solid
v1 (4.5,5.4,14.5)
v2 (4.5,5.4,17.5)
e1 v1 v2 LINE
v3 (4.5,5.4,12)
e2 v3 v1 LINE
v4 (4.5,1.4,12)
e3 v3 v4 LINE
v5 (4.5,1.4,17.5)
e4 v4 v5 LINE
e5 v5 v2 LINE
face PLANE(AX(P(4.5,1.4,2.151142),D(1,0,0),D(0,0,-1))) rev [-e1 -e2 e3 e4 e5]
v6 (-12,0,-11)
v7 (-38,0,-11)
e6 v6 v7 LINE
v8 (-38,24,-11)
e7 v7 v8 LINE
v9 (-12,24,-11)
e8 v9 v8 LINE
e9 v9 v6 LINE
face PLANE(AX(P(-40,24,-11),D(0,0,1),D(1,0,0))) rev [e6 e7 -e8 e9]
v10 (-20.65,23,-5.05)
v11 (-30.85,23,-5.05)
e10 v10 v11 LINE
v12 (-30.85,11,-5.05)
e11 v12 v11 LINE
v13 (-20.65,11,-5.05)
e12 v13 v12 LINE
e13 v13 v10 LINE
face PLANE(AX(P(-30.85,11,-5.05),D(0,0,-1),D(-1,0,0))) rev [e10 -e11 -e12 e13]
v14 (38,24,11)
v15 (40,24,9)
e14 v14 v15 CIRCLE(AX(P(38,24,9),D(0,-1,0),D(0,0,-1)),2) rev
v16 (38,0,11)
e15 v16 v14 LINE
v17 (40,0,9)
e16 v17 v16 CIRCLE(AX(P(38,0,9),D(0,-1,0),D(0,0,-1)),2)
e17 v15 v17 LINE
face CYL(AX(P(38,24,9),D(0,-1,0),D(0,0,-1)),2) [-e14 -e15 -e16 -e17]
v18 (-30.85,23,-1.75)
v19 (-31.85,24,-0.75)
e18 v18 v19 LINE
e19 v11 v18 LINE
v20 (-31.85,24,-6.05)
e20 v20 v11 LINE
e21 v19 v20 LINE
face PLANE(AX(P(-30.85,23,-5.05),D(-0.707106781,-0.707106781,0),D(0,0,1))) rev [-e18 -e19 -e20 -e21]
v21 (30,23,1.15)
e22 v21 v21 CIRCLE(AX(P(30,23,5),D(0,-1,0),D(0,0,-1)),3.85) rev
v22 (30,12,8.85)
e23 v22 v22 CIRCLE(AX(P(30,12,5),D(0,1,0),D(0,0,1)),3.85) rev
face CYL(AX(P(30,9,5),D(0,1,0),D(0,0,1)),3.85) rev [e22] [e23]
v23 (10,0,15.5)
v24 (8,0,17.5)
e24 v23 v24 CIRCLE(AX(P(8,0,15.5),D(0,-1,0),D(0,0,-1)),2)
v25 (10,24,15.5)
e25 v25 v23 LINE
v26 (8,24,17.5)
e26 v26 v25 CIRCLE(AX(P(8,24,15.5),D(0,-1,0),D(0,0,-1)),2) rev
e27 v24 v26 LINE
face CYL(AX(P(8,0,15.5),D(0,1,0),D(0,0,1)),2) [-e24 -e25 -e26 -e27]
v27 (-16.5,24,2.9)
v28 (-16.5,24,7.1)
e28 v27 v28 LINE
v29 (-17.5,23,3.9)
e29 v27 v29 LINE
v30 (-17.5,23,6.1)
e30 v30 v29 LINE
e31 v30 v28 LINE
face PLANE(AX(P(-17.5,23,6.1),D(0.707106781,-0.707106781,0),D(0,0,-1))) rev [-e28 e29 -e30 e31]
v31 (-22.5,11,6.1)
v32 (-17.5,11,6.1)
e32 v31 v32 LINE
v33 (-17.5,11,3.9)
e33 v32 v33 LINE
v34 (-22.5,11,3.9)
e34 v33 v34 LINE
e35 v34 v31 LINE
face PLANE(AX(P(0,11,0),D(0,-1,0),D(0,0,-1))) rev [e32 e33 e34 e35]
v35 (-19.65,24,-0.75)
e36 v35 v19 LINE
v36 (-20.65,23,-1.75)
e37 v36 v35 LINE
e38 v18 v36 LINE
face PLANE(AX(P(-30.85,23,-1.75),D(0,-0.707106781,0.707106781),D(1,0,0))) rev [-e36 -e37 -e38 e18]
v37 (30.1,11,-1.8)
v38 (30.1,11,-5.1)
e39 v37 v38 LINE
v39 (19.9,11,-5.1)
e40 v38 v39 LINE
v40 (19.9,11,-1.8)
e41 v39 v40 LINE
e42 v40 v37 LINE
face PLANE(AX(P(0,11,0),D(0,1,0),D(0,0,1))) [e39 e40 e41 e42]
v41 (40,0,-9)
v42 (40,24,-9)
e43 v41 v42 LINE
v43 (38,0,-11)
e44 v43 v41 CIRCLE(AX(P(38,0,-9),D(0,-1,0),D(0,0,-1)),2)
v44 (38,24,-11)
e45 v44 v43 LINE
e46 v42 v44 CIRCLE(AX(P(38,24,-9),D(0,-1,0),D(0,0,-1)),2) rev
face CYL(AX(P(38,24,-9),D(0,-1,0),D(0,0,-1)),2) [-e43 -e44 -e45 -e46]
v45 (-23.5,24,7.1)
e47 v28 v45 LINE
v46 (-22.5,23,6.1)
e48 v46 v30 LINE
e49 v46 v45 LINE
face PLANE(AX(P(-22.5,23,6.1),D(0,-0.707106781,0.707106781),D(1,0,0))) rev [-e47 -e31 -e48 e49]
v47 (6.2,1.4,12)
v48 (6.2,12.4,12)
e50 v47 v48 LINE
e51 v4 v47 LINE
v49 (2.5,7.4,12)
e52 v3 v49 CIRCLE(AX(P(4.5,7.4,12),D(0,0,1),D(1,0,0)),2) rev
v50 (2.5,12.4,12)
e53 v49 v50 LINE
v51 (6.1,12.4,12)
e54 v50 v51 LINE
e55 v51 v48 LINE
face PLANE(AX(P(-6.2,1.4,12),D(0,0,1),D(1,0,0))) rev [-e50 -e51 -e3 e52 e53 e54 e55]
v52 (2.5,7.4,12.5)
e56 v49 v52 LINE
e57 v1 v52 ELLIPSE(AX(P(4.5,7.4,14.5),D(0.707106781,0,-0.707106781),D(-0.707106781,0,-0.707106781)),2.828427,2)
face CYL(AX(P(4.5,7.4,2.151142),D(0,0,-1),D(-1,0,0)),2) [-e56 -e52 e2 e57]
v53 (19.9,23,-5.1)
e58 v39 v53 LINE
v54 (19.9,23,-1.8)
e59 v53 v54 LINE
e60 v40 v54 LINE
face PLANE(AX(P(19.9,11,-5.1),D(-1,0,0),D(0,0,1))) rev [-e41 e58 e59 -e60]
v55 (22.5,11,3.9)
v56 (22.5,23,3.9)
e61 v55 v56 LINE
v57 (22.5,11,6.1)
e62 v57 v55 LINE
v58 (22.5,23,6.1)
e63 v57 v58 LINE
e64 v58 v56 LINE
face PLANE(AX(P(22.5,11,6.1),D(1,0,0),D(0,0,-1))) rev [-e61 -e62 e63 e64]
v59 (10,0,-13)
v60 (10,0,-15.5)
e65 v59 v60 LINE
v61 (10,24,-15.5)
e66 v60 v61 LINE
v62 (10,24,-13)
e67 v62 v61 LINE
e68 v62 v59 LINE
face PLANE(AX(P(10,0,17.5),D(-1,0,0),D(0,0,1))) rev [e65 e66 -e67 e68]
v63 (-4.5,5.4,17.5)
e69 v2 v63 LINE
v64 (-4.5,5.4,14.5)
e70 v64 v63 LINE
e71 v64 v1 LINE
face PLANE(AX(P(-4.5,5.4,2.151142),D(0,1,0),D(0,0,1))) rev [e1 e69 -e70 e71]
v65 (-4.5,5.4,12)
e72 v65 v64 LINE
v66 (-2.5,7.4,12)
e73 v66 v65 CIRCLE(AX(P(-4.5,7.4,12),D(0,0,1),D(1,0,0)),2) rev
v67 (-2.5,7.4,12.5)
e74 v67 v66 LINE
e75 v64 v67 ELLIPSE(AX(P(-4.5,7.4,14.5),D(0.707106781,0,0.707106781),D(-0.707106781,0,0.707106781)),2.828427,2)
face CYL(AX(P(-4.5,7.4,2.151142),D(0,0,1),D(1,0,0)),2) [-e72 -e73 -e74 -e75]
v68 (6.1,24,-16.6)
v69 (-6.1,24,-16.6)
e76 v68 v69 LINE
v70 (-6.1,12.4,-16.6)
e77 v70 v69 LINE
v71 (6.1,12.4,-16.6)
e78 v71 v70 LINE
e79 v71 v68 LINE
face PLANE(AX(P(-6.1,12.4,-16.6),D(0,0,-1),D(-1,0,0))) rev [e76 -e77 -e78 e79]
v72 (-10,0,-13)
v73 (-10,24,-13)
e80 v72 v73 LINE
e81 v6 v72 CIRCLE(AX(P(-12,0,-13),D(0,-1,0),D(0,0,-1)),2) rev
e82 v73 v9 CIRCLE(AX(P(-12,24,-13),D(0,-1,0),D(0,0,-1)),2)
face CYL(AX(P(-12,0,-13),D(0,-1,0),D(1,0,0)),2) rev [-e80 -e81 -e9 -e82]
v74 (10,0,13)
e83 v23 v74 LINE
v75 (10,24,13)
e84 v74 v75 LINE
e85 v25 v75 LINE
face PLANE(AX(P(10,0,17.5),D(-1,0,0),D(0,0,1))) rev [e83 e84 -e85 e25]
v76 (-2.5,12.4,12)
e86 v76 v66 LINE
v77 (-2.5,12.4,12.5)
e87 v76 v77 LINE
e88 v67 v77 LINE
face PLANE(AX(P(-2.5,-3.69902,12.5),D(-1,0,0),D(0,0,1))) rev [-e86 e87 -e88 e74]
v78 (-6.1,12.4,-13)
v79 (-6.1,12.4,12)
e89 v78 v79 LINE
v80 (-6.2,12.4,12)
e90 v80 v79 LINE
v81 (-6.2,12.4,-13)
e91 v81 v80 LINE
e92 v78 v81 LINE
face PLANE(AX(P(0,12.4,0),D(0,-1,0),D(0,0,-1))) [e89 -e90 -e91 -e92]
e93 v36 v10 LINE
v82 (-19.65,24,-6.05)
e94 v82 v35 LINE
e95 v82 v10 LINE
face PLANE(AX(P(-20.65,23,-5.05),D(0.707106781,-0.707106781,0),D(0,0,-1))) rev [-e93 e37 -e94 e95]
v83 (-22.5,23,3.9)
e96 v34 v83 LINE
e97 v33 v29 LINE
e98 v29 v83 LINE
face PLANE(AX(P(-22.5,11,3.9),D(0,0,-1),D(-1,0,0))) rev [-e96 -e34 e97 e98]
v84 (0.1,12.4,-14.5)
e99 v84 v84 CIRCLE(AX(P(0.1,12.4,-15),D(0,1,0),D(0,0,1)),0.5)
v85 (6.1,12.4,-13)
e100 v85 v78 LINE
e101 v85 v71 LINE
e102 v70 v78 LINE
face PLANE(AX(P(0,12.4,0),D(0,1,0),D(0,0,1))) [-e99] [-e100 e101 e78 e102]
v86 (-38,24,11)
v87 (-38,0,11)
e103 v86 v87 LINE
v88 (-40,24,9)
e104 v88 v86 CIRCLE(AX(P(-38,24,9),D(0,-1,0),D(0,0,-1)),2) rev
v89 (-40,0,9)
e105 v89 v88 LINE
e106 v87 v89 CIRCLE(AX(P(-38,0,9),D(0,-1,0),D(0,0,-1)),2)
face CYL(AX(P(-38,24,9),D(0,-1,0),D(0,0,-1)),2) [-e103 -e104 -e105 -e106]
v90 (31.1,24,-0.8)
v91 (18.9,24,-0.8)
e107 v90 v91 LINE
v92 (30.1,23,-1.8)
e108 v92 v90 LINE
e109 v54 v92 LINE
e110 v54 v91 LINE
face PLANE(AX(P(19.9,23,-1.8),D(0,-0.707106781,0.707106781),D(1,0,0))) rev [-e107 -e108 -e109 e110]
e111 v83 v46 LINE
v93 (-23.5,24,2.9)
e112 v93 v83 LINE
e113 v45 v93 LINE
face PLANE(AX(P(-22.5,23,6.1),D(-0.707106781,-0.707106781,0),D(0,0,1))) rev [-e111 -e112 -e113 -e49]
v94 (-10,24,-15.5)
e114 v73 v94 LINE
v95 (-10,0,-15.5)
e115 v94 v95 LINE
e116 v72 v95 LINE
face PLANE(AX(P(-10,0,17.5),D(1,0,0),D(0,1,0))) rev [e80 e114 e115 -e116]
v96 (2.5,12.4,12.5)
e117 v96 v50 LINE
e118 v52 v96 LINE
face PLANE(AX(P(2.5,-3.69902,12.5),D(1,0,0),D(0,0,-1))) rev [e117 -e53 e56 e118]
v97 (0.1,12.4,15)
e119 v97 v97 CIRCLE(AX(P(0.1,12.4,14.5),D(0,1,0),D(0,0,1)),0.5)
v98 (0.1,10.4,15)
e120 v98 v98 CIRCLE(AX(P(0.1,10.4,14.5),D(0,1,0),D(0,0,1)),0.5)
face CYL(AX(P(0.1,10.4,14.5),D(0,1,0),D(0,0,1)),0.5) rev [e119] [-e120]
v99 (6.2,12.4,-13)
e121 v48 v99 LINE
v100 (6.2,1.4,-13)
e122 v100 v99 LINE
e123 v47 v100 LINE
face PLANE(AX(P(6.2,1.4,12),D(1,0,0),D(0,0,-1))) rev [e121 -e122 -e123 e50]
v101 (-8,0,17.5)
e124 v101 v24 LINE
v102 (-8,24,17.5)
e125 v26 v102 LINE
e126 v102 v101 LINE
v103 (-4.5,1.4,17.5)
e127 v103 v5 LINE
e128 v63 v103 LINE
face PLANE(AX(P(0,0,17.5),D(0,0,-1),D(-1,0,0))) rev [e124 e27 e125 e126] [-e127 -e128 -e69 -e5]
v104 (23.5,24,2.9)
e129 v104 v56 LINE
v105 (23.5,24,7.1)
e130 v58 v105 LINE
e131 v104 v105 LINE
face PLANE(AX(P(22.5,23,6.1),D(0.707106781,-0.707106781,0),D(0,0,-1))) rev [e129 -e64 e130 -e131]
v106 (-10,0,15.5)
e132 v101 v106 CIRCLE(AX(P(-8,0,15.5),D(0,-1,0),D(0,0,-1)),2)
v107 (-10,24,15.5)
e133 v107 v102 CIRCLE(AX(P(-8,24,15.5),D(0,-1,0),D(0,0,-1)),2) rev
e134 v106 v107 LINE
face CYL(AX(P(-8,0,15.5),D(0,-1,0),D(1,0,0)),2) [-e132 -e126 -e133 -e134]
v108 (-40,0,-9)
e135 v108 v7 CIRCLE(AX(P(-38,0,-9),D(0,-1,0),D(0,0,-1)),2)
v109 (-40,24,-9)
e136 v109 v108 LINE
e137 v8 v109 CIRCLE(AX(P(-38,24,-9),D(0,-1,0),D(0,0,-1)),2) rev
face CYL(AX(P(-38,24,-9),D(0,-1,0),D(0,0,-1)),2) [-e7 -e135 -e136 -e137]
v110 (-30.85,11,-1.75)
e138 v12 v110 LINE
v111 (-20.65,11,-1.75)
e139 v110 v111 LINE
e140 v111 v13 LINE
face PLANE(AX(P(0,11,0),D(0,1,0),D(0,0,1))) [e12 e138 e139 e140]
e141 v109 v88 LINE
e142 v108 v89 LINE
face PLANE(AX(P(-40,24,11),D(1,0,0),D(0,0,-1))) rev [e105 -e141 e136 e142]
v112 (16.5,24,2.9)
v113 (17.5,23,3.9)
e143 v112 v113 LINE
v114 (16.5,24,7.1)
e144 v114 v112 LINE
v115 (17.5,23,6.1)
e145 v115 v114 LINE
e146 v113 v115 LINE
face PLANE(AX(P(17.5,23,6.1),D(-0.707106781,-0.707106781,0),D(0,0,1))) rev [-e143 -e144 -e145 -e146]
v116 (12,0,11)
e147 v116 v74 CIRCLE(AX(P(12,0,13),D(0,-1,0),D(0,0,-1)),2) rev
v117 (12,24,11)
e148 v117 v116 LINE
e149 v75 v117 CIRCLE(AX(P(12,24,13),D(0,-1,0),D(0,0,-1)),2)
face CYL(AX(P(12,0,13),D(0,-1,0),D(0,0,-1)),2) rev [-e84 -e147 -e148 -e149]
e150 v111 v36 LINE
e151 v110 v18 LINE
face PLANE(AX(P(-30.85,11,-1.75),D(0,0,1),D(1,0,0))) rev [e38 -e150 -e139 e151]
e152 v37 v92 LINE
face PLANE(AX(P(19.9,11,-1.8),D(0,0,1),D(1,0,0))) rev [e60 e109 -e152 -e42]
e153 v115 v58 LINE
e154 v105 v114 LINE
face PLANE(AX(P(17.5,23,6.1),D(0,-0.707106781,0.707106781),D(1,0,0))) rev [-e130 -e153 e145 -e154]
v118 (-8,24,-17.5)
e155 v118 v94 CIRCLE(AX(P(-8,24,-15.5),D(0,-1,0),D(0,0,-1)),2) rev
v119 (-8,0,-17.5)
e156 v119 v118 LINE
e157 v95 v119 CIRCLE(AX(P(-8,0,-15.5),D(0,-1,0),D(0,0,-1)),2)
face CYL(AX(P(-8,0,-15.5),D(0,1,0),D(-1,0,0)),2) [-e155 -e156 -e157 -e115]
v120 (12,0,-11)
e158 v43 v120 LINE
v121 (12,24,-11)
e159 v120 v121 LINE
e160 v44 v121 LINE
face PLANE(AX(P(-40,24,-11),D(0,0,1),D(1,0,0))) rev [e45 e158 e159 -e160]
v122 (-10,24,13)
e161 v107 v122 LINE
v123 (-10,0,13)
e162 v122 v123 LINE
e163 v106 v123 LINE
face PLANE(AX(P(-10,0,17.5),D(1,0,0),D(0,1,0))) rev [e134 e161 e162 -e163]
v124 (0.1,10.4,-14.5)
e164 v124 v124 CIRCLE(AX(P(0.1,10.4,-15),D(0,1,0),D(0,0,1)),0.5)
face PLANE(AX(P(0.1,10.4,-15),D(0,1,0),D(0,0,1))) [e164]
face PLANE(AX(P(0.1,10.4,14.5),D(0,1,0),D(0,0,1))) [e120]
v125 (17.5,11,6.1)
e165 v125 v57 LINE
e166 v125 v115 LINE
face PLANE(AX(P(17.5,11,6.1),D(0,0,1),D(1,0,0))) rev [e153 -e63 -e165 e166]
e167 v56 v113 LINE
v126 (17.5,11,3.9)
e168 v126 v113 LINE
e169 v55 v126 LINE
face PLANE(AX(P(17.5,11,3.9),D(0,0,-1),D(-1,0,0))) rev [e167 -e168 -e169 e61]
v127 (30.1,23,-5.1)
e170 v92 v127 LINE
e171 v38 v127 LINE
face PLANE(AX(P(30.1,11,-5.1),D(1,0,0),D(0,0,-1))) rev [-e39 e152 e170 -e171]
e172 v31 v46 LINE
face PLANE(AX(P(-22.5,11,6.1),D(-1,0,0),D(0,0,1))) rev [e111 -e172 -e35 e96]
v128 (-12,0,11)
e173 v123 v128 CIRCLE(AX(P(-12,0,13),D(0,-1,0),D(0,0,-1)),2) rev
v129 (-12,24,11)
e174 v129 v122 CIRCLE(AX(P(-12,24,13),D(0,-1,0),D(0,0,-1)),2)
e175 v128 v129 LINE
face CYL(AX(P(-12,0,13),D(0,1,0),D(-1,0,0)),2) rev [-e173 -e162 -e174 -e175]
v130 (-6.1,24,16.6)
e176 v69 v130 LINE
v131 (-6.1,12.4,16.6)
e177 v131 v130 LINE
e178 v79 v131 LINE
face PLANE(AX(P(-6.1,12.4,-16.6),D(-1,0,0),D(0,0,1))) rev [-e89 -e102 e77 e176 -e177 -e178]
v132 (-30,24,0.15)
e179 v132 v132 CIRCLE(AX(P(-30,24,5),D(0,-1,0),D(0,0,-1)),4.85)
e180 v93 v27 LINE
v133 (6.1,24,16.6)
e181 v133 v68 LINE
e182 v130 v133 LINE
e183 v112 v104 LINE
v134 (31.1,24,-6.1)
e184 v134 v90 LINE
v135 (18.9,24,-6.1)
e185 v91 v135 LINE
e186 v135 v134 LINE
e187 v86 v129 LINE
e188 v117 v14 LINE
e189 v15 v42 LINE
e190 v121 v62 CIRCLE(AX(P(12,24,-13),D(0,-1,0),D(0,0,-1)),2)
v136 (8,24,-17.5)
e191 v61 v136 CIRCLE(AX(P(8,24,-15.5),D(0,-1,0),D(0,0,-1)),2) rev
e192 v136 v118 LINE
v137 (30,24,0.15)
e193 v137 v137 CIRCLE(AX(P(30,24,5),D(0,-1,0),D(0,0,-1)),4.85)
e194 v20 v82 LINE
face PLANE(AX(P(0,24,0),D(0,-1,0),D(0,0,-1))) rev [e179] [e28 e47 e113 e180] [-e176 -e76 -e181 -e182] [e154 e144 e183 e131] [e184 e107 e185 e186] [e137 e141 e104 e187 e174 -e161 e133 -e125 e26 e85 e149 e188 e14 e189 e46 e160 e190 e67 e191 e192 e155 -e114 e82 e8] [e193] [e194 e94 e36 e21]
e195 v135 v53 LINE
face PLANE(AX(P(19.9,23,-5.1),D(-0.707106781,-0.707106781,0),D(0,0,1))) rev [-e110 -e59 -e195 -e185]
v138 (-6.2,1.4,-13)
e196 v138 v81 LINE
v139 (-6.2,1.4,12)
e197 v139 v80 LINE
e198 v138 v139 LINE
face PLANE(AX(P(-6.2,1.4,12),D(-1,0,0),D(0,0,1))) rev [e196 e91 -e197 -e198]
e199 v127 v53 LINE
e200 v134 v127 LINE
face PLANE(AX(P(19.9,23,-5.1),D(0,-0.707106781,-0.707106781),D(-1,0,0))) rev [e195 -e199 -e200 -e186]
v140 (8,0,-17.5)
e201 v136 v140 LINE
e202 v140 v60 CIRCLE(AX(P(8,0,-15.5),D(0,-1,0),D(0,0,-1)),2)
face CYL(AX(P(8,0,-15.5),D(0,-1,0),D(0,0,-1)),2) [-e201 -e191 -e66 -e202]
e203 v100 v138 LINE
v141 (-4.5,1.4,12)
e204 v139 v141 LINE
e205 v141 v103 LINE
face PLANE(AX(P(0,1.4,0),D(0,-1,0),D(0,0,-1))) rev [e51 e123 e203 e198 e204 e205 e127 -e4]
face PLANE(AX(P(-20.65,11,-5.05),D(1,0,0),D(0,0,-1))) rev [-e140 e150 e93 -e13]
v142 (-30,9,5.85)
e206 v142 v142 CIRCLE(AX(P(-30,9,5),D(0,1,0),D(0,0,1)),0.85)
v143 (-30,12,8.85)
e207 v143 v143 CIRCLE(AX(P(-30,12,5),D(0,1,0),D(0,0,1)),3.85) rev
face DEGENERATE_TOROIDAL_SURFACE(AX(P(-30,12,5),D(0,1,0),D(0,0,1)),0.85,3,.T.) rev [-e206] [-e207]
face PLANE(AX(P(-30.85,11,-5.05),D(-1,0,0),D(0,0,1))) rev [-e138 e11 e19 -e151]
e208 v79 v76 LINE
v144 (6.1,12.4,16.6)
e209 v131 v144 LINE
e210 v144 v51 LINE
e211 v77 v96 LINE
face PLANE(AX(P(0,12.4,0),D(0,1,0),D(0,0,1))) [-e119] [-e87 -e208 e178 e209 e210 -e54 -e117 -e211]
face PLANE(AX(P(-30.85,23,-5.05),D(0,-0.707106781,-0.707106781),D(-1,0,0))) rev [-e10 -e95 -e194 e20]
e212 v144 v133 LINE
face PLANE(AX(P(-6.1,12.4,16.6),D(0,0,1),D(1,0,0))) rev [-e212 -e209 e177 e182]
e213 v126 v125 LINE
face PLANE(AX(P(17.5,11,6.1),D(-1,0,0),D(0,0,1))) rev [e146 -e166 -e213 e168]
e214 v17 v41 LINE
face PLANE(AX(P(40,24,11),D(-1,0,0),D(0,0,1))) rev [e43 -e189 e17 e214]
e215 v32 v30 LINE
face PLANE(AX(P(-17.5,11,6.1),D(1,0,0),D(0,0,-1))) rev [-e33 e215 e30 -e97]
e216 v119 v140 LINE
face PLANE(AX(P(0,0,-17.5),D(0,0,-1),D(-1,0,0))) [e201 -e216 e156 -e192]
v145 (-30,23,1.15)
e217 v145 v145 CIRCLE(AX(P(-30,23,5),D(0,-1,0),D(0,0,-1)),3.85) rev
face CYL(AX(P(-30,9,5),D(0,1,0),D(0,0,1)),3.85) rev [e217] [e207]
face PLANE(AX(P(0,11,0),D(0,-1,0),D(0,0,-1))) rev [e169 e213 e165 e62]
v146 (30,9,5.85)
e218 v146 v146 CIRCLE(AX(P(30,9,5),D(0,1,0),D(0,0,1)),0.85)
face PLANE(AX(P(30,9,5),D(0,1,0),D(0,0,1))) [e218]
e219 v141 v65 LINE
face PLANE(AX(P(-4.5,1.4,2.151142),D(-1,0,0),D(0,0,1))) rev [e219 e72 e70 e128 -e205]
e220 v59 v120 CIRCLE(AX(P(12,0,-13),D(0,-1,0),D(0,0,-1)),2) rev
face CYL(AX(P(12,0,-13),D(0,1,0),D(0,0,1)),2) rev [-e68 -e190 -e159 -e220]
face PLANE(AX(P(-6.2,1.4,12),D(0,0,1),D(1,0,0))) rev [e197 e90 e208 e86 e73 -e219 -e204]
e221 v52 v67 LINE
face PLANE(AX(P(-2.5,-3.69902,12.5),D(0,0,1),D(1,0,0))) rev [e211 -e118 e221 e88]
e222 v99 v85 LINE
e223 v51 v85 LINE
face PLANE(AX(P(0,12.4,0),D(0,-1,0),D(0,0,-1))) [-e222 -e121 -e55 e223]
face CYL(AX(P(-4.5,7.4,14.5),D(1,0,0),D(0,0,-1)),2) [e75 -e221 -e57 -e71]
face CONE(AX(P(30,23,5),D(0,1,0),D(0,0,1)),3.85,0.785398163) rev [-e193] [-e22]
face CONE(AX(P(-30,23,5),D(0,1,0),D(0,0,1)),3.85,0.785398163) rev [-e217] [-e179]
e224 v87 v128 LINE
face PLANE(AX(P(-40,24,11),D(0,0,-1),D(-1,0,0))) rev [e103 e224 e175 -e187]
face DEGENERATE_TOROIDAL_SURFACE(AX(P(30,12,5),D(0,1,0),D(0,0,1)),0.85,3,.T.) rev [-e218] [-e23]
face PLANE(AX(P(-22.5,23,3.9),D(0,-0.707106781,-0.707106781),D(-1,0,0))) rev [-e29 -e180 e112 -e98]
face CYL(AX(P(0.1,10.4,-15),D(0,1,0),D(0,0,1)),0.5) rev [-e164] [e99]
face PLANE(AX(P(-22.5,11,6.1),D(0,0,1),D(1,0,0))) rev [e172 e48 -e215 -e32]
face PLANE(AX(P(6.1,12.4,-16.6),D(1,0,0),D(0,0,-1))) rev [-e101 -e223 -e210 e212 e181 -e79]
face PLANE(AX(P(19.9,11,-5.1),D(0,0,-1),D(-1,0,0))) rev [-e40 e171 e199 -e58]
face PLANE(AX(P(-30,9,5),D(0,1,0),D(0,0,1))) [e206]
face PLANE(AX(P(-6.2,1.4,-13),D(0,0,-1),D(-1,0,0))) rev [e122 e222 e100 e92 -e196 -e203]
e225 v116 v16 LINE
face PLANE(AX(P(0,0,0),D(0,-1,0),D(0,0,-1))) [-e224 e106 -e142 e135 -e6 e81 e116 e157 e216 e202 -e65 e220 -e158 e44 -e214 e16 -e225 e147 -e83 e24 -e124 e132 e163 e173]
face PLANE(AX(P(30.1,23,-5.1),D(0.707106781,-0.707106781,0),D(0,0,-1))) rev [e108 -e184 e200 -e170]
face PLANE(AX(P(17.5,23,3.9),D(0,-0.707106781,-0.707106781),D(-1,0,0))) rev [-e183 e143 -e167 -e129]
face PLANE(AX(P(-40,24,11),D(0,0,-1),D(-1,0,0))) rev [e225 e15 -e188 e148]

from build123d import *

# Parameters (mm, degrees)
SKETCH1_W               = 80
SKETCH1_H               = 22
BOSS_EXTRUDE1_DEPTH     = 24
SKETCH2_R               = 3.85
EYESHAFT_HOLES_DEPTH    = 15
SKETCH5_W               = 5
SKETCH5_H               = 2.2
FRONT_LEG_HOLES_DEPTH   = 13
SKETCH6_W               = 20
SKETCH6_H               = 24
SERVO_BLOCK_DEPTH       = 17.5
SKETCH7_W               = 10.2
SKETCH7_H               = 3.3
BACK_LEGS_DEPTH         = 13
FILLET1_R               = 3
SKETCH8_R               = 2.714277304
CUT_EXTRUDE4_DEPTH      = 14
SKETCH9_W               = 12.2
SKETCH9_H               = 33.2
SERVO_ARMS1_DEPTH       = 11.6
FILLET2_R               = 2
CHAMFER1_SIZE           = 1
SKETCH14_W              = 12.4
SKETCH14_H              = 25
CUT_EXTRUDE5_DEPTH      = 11
SKETCH15_W              = 9
SKETCH15_H              = 4
CUT_EXTRUDE6_DEPTH      = 5.5
SKETCH16_W              = 5
SKETCH16_H              = 1
CUT_EXTRUDE7_DEPTH      = 11
SKETCH13_R              = 0.5
SERVO_SCREW_HOLES_DEPTH = 2
FILLET3_R               = 2


with BuildPart() as part:
    # Sketch1 → Boss-Extrude1 (new body)
    with BuildSketch(Plane(origin=(0, 0, 0), x_dir=(1, 0, 0), z_dir=(0, 1, 0))):
        Rectangle(SKETCH1_W, SKETCH1_H)
    extrude(amount=BOSS_EXTRUDE1_DEPTH)

    # Sketch2 → Eyeshaft holes (cut)
    with BuildSketch(Plane(origin=(0, 24, 0), x_dir=(1, 0, 0), z_dir=(0, 1, 0))):
        with Locations(Location((-30, -5, 0), (0, 0, 270))):
            Circle(SKETCH2_R)
        with Locations(Location((30, -5, 0), (0, 0, 270))):
            Circle(SKETCH2_R)
    extrude(amount=-EYESHAFT_HOLES_DEPTH, mode=Mode.SUBTRACT)

    # Sketch5 → Front leg holes (cut)
    with BuildSketch(Plane(origin=(0, 24, 0), x_dir=(1, 0, 0), z_dir=(0, 1, 0))):
        with Locations((-20, -5)):
            Rectangle(SKETCH5_W, SKETCH5_H)
        with Locations((20, -5)):
            Rectangle(SKETCH5_W, SKETCH5_H)
    extrude(amount=-FRONT_LEG_HOLES_DEPTH, mode=Mode.SUBTRACT)

    # Sketch6 → Servo block (add, symmetric)
    with BuildSketch(Plane.XY):
        with Locations((0, 12)):
            Rectangle(SKETCH6_W, SKETCH6_H)
    extrude(amount=SERVO_BLOCK_DEPTH, both=True)

    # Sketch7 → Back Legs (cut)
    with BuildSketch(Plane(origin=(0, 24, 0), x_dir=(1, 0, 0), z_dir=(0, 1, 0))):
        with Locations((-25.75, 3.4)):
            Rectangle(SKETCH7_W, SKETCH7_H)
        with Locations((25, 3.45)):
            Rectangle(SKETCH7_W, SKETCH7_H)
    extrude(amount=-BACK_LEGS_DEPTH, mode=Mode.SUBTRACT)

    # Fillet1
    fillet1_edges = [part.edges().sort_by_distance(p)[0] for p in [
        (-30, 9, 1.15),
        (30, 9, 1.15),
    ]]
    fillet(fillet1_edges, radius=FILLET1_R)

    # Sketch8 → Cut-Extrude4 (cut)
    with BuildSketch(Plane(origin=(0, 24, 0), x_dir=(1, 0, 0), z_dir=(0, 1, 0))):
        with Locations(Location((0, -5, 0), (0, 0, 270))):
            Circle(SKETCH8_R)
    extrude(amount=-CUT_EXTRUDE4_DEPTH, mode=Mode.SUBTRACT)

    # Sketch9 → Servo arms1 (cut)
    with BuildSketch(Plane(origin=(0, 24, 0), x_dir=(1, 0, 0), z_dir=(0, 1, 0))):
        Rectangle(SKETCH9_W, SKETCH9_H)
    extrude(amount=-SERVO_ARMS1_DEPTH, mode=Mode.SUBTRACT)

    # Fillet2
    fillet2_edges = [part.edges().sort_by_distance(p)[0] for p in [
        (10, 12, -11),
        (10, 12, -17.5),
        (10, 12, 11),
        (-10, 12, -11),
        (-10, 12, -17.5),
        (-10, 12, 11),
        (10, 12, 17.5),
        (-10, 12, 17.5),
        (40, 12, 11),
        (-40, 12, 11),
        (-40, 12, -11),
        (40, 12, -11),
    ]]
    fillet(fillet2_edges, radius=FILLET2_R)

    # Chamfer1
    chamfer1_edges = [part.edges().sort_by_distance(p)[0] for p in [
        (-30, 24, 1.15),
        (30, 24, 1.15),
        (-17.5, 24, 5),
        (-20, 24, 3.9),
        (-22.5, 24, 5),
        (-20, 24, 6.1),
        (22.5, 24, 5),
        (20, 24, 3.9),
        (17.5, 24, 5),
        (20, 24, 6.1),
        (-30.85, 24, -3.4),
        (-25.75, 24, -1.75),
        (-20.65, 24, -3.4),
        (-25.75, 24, -5.05),
        (19.9, 24, -3.45),
        (25, 24, -1.8),
        (30.1, 24, -3.45),
        (25, 24, -5.1),
    ]]
    chamfer(chamfer1_edges, length=CHAMFER1_SIZE)

    # Sketch14 → Cut-Extrude5 (cut)
    with BuildSketch(Plane(origin=(0, 12.4, 0), x_dir=(1, 0, 0), z_dir=(0, 1, 0))):
        with Locations((0, 0.5)):
            Rectangle(SKETCH14_W, SKETCH14_H)
    extrude(amount=-CUT_EXTRUDE5_DEPTH, mode=Mode.SUBTRACT)

    # Sketch15 → Cut-Extrude6 (cut)
    with BuildSketch(Plane.XY.offset(17.5)):
        with Locations((0, 3.4)):
            Rectangle(SKETCH15_W, SKETCH15_H)
    extrude(amount=-CUT_EXTRUDE6_DEPTH, mode=Mode.SUBTRACT)

    # Sketch16 → Cut-Extrude7 (cut)
    with BuildSketch(Plane(origin=(0, 12.4, 0), x_dir=(1, 0, 0), z_dir=(0, 1, 0))):
        with Locations((0, -12)):
            Rectangle(SKETCH16_W, SKETCH16_H)
    extrude(amount=-CUT_EXTRUDE7_DEPTH, mode=Mode.SUBTRACT)

    # Sketch13 → Servo Screw Holes (cut)
    with BuildSketch(Plane(origin=(0, 12.4, 0), x_dir=(1, 0, 0), z_dir=(0, 1, 0))):
        with Locations(Location((0.1, 15, 0), (0, 0, 270))):
            Circle(SKETCH13_R)
        with Locations(Location((0.1, -14.5, 0), (0, 0, 270))):
            Circle(SKETCH13_R)
    extrude(amount=-SERVO_SCREW_HOLES_DEPTH, mode=Mode.SUBTRACT)

    # Fillet3
    fillet3_edges = [part.edges().sort_by_distance(p)[0] for p in [
        (0, 5.4, 12.5),
        (2.5, 5.4, 12.25),
        (-2.5, 5.4, 12.25),
    ]]
    fillet(fillet3_edges, radius=FILLET3_R - 0.0001)  # a hair under: the kernel refuses the full size


solid = part.part
